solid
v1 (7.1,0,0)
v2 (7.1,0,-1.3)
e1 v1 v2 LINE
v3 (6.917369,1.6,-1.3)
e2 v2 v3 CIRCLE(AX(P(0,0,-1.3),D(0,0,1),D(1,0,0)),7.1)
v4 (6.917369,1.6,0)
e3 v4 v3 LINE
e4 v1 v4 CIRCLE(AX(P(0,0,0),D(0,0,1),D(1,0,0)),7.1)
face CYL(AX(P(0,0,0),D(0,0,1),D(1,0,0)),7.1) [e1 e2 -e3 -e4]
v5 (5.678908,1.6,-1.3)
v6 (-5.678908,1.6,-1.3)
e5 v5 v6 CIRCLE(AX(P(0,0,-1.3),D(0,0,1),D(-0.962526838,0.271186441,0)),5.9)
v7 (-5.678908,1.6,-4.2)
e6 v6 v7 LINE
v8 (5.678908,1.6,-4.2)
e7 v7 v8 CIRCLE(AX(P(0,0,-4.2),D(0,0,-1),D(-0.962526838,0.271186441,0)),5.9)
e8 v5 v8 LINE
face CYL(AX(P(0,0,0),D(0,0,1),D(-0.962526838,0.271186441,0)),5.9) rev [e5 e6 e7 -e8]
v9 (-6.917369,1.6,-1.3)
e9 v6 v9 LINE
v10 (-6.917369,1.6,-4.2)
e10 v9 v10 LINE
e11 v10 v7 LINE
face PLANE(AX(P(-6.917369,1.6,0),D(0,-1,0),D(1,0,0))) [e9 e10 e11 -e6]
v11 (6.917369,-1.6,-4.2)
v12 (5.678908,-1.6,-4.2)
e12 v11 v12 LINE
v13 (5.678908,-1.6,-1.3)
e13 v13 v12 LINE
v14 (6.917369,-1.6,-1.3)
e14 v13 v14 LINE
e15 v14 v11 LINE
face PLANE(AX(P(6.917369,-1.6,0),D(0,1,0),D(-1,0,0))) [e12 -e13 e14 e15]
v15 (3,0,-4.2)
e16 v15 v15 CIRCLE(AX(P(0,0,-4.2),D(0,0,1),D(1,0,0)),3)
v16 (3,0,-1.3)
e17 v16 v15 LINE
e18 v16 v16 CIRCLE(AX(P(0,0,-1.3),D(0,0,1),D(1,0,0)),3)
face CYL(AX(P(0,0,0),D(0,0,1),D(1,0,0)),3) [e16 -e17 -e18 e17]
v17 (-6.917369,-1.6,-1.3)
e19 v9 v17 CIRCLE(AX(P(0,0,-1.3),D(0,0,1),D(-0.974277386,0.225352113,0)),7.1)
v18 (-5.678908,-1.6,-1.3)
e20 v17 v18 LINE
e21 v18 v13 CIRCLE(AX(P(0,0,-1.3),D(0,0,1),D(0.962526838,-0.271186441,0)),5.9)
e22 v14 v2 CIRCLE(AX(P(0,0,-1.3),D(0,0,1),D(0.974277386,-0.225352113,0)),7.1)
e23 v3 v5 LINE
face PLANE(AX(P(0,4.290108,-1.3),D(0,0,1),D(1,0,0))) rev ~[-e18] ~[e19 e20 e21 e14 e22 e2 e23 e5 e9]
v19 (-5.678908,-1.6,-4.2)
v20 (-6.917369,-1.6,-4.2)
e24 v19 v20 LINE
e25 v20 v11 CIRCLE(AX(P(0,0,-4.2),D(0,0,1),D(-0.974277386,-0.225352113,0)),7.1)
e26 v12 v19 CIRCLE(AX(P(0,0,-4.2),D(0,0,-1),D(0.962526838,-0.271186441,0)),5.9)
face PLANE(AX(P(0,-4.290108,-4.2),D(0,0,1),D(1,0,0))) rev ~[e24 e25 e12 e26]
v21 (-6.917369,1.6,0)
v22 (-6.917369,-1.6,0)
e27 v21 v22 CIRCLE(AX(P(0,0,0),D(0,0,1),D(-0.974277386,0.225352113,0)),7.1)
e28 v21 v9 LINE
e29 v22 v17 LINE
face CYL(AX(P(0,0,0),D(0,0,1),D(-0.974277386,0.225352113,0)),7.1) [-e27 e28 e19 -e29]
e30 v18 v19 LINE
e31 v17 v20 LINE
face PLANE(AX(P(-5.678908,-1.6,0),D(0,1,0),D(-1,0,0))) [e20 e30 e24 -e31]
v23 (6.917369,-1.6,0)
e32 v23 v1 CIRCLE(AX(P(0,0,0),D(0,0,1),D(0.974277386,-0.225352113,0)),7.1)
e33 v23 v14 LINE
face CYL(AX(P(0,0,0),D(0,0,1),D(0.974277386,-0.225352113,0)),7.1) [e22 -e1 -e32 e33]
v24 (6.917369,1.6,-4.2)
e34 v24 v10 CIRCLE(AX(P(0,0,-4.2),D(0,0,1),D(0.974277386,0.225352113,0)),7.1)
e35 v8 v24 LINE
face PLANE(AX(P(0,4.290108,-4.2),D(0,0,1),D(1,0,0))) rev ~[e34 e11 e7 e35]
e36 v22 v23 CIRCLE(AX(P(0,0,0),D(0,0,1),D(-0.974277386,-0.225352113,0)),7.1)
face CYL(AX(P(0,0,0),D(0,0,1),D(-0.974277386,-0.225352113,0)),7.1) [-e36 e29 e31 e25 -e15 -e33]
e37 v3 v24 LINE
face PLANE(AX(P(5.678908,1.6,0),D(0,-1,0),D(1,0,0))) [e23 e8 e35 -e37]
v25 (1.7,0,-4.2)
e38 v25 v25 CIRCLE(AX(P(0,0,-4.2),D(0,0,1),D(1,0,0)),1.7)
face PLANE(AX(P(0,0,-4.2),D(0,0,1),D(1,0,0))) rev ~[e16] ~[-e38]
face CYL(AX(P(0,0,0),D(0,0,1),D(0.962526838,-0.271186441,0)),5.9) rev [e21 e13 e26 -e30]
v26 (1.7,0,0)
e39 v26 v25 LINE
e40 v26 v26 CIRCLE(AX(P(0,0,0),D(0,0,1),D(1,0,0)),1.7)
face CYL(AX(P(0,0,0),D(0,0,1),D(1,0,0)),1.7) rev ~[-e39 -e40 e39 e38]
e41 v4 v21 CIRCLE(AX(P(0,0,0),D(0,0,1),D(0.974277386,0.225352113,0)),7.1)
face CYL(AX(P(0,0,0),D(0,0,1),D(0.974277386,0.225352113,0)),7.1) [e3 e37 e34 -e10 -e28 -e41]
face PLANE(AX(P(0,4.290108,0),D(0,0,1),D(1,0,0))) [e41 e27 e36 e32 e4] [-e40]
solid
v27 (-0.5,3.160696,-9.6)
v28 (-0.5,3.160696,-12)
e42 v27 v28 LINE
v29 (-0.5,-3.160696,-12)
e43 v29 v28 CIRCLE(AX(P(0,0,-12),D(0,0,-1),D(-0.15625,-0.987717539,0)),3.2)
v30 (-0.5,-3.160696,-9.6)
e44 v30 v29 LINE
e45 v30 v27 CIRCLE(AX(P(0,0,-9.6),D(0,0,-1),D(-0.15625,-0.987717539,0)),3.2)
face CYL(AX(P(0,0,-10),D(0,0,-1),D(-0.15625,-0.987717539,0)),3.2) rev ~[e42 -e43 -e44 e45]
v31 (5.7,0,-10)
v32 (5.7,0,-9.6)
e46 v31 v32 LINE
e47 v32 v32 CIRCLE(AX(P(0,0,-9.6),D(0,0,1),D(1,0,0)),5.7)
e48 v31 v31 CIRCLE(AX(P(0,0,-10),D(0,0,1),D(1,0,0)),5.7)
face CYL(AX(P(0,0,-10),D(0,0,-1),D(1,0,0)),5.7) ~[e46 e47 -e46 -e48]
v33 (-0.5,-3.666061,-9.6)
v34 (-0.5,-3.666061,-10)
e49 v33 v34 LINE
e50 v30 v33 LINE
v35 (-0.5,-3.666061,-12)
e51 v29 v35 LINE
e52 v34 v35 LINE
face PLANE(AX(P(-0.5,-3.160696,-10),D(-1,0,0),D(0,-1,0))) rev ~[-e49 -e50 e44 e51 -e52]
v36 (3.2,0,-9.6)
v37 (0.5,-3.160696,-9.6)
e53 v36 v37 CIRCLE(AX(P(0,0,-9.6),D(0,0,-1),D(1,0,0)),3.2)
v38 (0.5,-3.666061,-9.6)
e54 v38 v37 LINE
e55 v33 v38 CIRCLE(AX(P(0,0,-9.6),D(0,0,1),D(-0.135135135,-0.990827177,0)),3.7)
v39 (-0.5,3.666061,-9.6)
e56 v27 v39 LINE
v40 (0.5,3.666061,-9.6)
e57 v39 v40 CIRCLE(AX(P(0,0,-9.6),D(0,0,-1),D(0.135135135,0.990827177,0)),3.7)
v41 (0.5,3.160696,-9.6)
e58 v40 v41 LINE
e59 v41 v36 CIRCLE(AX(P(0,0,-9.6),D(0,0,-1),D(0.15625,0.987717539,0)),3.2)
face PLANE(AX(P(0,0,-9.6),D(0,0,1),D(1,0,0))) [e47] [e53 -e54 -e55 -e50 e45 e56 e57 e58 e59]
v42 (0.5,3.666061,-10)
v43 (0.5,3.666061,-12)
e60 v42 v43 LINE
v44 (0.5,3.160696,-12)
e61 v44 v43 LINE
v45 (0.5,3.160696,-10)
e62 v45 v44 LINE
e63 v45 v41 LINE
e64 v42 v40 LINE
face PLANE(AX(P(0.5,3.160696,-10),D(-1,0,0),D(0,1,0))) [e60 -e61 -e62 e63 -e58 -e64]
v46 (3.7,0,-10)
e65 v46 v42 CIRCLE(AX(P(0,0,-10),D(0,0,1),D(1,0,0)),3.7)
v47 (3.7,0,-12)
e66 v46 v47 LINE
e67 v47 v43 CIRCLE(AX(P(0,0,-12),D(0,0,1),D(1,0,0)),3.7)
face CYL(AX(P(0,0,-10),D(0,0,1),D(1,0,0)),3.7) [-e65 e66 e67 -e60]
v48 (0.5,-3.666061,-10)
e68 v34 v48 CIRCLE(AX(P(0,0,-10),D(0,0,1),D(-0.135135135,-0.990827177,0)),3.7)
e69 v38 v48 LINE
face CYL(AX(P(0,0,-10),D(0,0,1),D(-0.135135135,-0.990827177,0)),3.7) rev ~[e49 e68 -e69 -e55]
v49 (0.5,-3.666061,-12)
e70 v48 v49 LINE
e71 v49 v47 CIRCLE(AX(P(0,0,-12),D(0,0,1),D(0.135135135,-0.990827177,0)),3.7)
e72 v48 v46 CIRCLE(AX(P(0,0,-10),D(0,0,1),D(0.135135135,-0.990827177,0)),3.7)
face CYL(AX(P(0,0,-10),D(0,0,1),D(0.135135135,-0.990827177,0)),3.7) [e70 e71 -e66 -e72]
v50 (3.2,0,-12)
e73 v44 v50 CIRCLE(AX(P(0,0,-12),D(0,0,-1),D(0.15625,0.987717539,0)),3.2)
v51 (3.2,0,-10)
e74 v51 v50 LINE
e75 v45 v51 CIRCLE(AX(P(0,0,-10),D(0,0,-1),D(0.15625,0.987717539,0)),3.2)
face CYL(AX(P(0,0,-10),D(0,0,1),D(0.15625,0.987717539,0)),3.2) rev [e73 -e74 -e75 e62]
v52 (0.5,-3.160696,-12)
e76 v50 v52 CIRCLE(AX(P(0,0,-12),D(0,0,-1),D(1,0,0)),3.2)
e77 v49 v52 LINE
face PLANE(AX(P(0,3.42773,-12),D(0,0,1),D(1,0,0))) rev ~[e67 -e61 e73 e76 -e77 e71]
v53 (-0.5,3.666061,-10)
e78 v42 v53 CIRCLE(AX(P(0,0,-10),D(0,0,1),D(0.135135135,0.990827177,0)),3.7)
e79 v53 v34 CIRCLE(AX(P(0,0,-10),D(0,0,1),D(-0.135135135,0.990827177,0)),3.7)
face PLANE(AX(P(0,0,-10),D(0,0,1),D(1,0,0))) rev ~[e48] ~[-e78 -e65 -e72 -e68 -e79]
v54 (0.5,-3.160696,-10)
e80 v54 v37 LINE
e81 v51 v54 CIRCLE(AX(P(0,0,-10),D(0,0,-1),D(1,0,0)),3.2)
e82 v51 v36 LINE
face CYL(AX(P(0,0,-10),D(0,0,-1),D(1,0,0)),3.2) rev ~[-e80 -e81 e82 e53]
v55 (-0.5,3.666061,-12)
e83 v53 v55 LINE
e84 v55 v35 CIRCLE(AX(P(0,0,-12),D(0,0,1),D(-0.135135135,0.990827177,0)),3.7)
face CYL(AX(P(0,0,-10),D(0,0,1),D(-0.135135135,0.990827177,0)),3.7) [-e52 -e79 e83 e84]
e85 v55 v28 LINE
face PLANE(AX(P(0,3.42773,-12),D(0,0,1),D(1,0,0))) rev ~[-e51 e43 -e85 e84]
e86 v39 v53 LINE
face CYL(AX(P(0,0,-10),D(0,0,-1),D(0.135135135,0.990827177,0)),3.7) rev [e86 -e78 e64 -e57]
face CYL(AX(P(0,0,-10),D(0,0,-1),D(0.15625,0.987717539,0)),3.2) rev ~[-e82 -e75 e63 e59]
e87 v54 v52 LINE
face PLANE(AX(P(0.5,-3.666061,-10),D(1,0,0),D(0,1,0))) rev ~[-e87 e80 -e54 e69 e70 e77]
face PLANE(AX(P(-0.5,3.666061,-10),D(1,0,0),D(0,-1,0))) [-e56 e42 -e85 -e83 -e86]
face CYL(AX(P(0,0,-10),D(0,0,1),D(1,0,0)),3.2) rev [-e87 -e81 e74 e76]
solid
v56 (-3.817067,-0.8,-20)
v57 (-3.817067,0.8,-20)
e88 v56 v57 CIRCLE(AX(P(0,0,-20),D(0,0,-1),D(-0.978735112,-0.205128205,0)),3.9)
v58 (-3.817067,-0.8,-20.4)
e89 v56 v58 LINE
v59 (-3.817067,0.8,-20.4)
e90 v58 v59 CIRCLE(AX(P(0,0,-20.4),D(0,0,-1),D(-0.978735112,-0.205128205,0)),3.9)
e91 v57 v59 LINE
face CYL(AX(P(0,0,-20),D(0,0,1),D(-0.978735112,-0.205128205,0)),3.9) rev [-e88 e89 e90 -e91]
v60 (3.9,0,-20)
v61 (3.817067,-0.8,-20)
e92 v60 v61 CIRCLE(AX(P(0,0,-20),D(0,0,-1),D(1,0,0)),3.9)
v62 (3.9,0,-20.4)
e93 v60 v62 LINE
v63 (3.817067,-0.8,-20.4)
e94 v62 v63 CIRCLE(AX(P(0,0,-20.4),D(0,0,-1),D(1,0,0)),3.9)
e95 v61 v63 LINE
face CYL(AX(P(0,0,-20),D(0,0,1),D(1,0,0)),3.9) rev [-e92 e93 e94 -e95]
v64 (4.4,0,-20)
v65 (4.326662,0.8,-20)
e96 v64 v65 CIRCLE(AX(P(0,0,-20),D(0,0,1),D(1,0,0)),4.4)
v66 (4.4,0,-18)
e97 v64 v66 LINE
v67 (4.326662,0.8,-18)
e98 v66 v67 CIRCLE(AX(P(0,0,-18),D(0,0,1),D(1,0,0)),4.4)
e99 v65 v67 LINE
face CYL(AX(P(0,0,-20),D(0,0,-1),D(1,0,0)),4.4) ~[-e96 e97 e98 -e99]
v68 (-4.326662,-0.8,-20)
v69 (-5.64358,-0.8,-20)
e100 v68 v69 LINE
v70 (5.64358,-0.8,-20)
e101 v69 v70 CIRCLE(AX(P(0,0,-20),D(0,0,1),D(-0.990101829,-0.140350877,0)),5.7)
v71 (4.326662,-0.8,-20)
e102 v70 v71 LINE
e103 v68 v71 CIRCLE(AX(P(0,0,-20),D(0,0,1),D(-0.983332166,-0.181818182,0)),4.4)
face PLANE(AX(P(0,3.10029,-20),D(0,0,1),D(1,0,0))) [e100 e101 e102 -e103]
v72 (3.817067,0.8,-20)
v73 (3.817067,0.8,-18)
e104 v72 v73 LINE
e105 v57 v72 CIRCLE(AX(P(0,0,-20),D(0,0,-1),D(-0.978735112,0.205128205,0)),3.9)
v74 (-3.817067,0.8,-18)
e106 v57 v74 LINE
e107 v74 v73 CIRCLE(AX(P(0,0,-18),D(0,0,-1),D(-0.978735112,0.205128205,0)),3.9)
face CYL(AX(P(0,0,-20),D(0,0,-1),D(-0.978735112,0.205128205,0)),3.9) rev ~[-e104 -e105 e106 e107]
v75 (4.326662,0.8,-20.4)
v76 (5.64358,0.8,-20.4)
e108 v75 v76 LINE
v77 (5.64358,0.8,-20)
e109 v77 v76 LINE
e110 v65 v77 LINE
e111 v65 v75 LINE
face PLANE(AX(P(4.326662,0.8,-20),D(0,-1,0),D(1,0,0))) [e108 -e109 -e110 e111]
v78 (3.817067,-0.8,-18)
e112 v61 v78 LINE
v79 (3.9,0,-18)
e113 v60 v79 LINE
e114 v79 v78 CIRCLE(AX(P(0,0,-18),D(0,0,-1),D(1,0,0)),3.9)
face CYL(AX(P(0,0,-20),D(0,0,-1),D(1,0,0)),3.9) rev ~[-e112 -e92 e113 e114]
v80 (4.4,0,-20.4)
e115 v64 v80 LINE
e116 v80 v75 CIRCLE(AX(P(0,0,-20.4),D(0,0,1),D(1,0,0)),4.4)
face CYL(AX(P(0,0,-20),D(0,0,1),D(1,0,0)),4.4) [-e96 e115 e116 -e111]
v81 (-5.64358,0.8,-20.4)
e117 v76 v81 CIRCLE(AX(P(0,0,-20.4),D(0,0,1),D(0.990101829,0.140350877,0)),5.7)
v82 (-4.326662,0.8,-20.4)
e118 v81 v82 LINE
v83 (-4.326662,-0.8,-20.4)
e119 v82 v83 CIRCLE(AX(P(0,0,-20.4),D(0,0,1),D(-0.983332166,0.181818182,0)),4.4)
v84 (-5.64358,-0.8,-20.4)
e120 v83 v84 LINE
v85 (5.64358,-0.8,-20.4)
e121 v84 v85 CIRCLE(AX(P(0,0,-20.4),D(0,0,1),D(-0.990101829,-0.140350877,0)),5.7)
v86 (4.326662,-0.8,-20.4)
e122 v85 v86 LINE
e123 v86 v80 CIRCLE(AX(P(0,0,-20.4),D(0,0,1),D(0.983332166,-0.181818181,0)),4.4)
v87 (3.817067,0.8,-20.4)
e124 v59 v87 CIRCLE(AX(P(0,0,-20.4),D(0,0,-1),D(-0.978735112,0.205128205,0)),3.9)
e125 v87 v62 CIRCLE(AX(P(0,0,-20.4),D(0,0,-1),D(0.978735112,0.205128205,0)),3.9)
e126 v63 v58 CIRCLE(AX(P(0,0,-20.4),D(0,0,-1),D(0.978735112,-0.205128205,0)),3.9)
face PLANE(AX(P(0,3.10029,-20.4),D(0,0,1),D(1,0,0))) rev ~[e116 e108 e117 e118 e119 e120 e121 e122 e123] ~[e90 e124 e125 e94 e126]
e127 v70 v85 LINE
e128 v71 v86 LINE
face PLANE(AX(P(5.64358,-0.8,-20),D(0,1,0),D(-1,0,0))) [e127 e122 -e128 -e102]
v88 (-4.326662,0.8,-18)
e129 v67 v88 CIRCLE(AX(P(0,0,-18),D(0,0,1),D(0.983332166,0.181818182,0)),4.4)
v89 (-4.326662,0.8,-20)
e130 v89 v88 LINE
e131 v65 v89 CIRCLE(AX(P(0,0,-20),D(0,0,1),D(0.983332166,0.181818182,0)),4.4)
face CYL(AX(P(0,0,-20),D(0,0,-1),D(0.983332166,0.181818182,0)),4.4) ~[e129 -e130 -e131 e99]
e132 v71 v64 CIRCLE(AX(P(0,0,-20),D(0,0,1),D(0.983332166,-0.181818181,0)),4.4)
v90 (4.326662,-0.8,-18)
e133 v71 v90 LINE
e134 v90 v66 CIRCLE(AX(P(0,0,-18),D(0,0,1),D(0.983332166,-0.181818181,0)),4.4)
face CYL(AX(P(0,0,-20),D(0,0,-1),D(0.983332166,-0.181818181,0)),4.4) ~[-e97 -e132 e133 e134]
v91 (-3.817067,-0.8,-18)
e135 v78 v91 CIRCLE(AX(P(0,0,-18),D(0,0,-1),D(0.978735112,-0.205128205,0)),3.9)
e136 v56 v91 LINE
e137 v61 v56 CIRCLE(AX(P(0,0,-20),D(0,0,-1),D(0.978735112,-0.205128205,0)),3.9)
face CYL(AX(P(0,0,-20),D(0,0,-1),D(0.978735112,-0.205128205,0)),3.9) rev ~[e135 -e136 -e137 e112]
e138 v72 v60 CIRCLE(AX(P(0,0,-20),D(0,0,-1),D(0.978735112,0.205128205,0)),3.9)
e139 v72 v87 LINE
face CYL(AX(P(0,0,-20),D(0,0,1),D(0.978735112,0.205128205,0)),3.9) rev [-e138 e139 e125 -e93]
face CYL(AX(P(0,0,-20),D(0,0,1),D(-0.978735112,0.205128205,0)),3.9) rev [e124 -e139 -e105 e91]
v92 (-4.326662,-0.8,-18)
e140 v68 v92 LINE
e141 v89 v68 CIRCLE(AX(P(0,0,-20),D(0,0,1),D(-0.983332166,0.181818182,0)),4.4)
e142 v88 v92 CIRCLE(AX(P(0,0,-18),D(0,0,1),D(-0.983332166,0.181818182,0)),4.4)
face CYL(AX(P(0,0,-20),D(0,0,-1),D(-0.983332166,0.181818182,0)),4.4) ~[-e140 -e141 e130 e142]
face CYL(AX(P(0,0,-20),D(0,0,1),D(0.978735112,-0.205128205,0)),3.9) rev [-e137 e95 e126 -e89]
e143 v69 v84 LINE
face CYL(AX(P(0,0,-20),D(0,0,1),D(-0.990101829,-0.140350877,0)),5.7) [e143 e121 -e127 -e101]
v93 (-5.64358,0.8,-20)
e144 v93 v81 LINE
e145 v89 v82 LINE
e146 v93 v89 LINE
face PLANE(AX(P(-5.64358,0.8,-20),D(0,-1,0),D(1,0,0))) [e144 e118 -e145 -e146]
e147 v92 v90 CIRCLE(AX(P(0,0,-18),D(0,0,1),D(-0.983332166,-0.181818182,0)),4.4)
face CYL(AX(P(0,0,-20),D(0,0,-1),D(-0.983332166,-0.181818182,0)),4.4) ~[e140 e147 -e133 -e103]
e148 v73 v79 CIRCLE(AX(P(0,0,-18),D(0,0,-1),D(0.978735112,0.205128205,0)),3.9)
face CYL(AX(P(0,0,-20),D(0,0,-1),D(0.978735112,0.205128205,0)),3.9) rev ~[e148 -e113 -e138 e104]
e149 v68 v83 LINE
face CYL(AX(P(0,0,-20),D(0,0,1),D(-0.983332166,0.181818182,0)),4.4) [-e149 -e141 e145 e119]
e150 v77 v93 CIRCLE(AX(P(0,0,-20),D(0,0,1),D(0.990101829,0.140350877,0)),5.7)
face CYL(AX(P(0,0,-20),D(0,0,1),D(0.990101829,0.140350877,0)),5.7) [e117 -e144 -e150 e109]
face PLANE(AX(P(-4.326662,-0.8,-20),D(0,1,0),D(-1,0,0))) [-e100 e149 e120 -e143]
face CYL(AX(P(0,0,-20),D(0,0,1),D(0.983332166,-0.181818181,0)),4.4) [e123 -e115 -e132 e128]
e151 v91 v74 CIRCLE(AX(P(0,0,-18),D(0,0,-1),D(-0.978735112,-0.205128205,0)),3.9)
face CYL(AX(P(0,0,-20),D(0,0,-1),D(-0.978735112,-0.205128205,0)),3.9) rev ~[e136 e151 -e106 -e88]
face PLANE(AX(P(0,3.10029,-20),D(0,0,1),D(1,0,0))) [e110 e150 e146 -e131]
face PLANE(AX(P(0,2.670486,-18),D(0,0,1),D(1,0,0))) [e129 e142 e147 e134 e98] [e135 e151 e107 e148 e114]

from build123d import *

# Parameters (mm, degrees)
F1_DEPTH  = 4.2
F0_R      = 3
F0_R_2    = 1.7
F2_DEPTH  = 1.3
F5_DEPTH  = 2
F4_R      = 5.7
F6_DEPTH  = 0.4
F7_DEPTH  = 2
F10_DEPTH = 2
F11_DEPTH = 0.4


with BuildPart() as f1:
    # F0 (on Top) → F1 (new body)
    with BuildSketch(Plane.XY):
        with BuildLine():
            Line((5.6789083458, 1.6), (6.9173694422, 1.6))
            ThreePointArc((6.9173694422, 1.6), (0, 7.1), (-6.9173694422, 1.6))
            Line((-6.9173694422, 1.6), (-5.6789083458, 1.6))
            ThreePointArc((-5.6789083458, 1.6), (0, 5.9), (5.6789083458, 1.6))
        make_face()
    extrude(amount=-F1_DEPTH)



with BuildPart() as f1b:
    # F0 (on Top) → F1, piece 2 (new body)
    with BuildSketch(Plane.XY):
        with BuildLine():
            ThreePointArc((-6.9173694422, -1.6), (0, -7.1), (6.9173694422, -1.6))
            Line((6.9173694422, -1.6), (5.6789083458, -1.6))
            ThreePointArc((5.6789083458, -1.6), (0, -5.9), (-5.6789083458, -1.6))
            Line((-5.6789083458, -1.6), (-6.9173694422, -1.6))
        make_face()
    extrude(amount=-F1_DEPTH)


with BuildPart() as f1c:
    # F0 (on Top) → F1, piece 3 (new body)
    with BuildSketch(Plane.XY):
        Circle(F0_R)
        Circle(F0_R_2, mode=Mode.SUBTRACT)
    extrude(amount=-F1_DEPTH)


with BuildPart() as f1_1:
    add(f1.part)

    add(f1b.part)  # F2 merges F1b

    add(f1c.part)  # F2 merges F1c
    # F0 (on Top) → F2 (join)
    with BuildSketch(Plane.XY):
        with BuildLine():
            Line((5.6789083458, 1.6), (6.9173694422, 1.6))
            ThreePointArc((6.9173694422, 1.6), (0, 7.1), (-6.9173694422, 1.6))
            Line((-6.9173694422, 1.6), (-5.6789083458, 1.6))
            ThreePointArc((-5.6789083458, 1.6), (0, 5.9), (5.6789083458, 1.6))
        make_face()
        with BuildLine():
            Line((-5.6789083458, 1.6), (-6.9173694422, 1.6))
            ThreePointArc((-6.9173694422, 1.6), (-7.1, 0), (-6.9173694422, -1.6))
            Line((-6.9173694422, -1.6), (-5.6789083458, -1.6))
            ThreePointArc((-5.6789083458, -1.6), (-5.9, 0), (-5.6789083458, 1.6))
        make_face()
        with BuildLine():
            ThreePointArc((-6.9173694422, -1.6), (0, -7.1), (6.9173694422, -1.6))
            Line((6.9173694422, -1.6), (5.6789083458, -1.6))
            ThreePointArc((5.6789083458, -1.6), (0, -5.9), (-5.6789083458, -1.6))
            Line((-5.6789083458, -1.6), (-6.9173694422, -1.6))
        make_face()
        with BuildLine():
            ThreePointArc((6.9173694422, -1.6), (7.0541946046, -0.8051946846), (7.1, 0))
            ThreePointArc((7.1, 0), (7.0541946046, 0.8051946846), (6.9173694422, 1.6))
            Line((6.9173694422, 1.6), (5.6789083458, 1.6))
            ThreePointArc((5.6789083458, 1.6), (5.8444657258, 0.807601622), (5.9, 0))
            ThreePointArc((5.9, 0), (5.8444657258, -0.807601622), (5.6789083458, -1.6))
            Line((5.6789083458, -1.6), (6.9173694422, -1.6))
        make_face()
        with BuildLine():
            Line((5.6789083458, -1.6), (5.6789083458, 1.6))
            ThreePointArc((5.6789083458, 1.6), (0, 5.9), (-5.6789083458, 1.6))
            Line((-5.6789083458, 1.6), (-5.6789083458, -1.6))
            ThreePointArc((-5.6789083458, -1.6), (0, -5.9), (5.6789083458, -1.6))
        make_face()
        Circle(F0_R, mode=Mode.SUBTRACT)
        with BuildLine():
            Line((-5.6789083458, -1.6), (-5.6789083458, 1.6))
            ThreePointArc((-5.6789083458, 1.6), (-5.9, 0), (-5.6789083458, -1.6))
        make_face()
        with BuildLine():
            ThreePointArc((5.9, 0), (5.8444657258, 0.807601622), (5.6789083458, 1.6))
            Line((5.6789083458, 1.6), (5.6789083458, -1.6))
            ThreePointArc((5.6789083458, -1.6), (5.8444657258, -0.807601622), (5.9, 0))
        make_face()
    extrude(amount=-F2_DEPTH)


with BuildPart() as f5:
    # F4 (on offset) → F5 (new body)
    with BuildSketch(Plane.XY.offset(-10)):
        with BuildLine():
            ThreePointArc((-0.5, 3.1606961259), (0, 3.2), (0.5, 3.1606961259))
            Line((0.5, 3.1606961259), (0.5, 3.666060556))
            ThreePointArc((0.5, 3.666060556), (0, 3.7), (-0.5, 3.666060556))
            Line((-0.5, 3.666060556), (-0.5, 3.1606961259))
        make_face()
        with BuildLine():
            ThreePointArc((-0.5, -3.1606961259), (-3.2, 0), (-0.5, 3.1606961259))
            Line((-0.5, 3.1606961259), (-0.5, 3.666060556))
            ThreePointArc((-0.5, 3.666060556), (-3.7, 0), (-0.5, -3.666060556))
            Line((-0.5, -3.666060556), (-0.5, -3.1606961259))
        make_face()
        with BuildLine():
            Line((0.5, -3.666060556), (0.5, -3.1606961259))
            ThreePointArc((0.5, -3.1606961259), (0, -3.2), (-0.5, -3.1606961259))
            Line((-0.5, -3.1606961259), (-0.5, -3.666060556))
            ThreePointArc((-0.5, -3.666060556), (0, -3.7), (0.5, -3.666060556))
        make_face()
        with BuildLine():
            ThreePointArc((0.5, 3.1606961259), (2.4331050121, 2.0784609691), (3.2, 0))
            ThreePointArc((3.2, 0), (2.4331050121, -2.0784609691), (0.5, -3.1606961259))
            Line((0.5, -3.1606961259), (0.5, -3.666060556))
            ThreePointArc((0.5, -3.666060556), (2.787471973, -2.4331050121), (3.7, 0))
            ThreePointArc((3.7, 0), (2.787471973, 2.4331050121), (0.5, 3.666060556))
            Line((0.5, 3.666060556), (0.5, 3.1606961259))
        make_face()
    extrude(amount=-F5_DEPTH)

    # F4 (on offset) → F6 (join)
    with BuildSketch(Plane.XY.offset(-10)):
        Circle(F4_R)
        with BuildLine():
            Line((0.5, 4.331942182), (0.5, 3.666060556))
            ThreePointArc((0.5, 3.666060556), (2.787471973, 2.4331050121), (3.7, 0))
            ThreePointArc((3.7, 0), (2.787471973, -2.4331050121), (0.5, -3.666060556))
            Line((0.5, -3.666060556), (0.5, -4.331942182))
            Line((0.5, -4.331942182), (-0.5, -4.331942182))
            Line((-0.5, -4.331942182), (-0.5, -3.666060556))
            ThreePointArc((-0.5, -3.666060556), (-3.7, 0), (-0.5, 3.666060556))
            Line((-0.5, 3.666060556), (-0.5, 4.331942182))
            Line((-0.5, 4.331942182), (0.5, 4.331942182))
        make_face(mode=Mode.SUBTRACT)
        with BuildLine():
            ThreePointArc((-0.5, -3.1606961259), (-3.2, 0), (-0.5, 3.1606961259))
            Line((-0.5, 3.1606961259), (-0.5, 3.666060556))
            ThreePointArc((-0.5, 3.666060556), (-3.7, 0), (-0.5, -3.666060556))
            Line((-0.5, -3.666060556), (-0.5, -3.1606961259))
        make_face()
        with BuildLine():
            ThreePointArc((0.5, 3.1606961259), (2.4331050121, 2.0784609691), (3.2, 0))
            ThreePointArc((3.2, 0), (2.4331050121, -2.0784609691), (0.5, -3.1606961259))
            Line((0.5, -3.1606961259), (0.5, -3.666060556))
            ThreePointArc((0.5, -3.666060556), (2.787471973, -2.4331050121), (3.7, 0))
            ThreePointArc((3.7, 0), (2.787471973, 2.4331050121), (0.5, 3.666060556))
            Line((0.5, 3.666060556), (0.5, 3.1606961259))
        make_face()
        with BuildLine():
            ThreePointArc((-0.5, 3.666060556), (0, 3.7), (0.5, 3.666060556))
            Line((0.5, 3.666060556), (0.5, 4.331942182))
            Line((0.5, 4.331942182), (-0.5, 4.331942182))
            Line((-0.5, 4.331942182), (-0.5, 3.666060556))
        make_face()
        with BuildLine():
            Line((0.5, -4.331942182), (0.5, -3.666060556))
            ThreePointArc((0.5, -3.666060556), (0, -3.7), (-0.5, -3.666060556))
            Line((-0.5, -3.666060556), (-0.5, -4.331942182))
            Line((-0.5, -4.331942182), (0.5, -4.331942182))
        make_face()
        with BuildLine():
            ThreePointArc((-0.5, 3.1606961259), (0, 3.2), (0.5, 3.1606961259))
            Line((0.5, 3.1606961259), (0.5, 3.666060556))
            ThreePointArc((0.5, 3.666060556), (0, 3.7), (-0.5, 3.666060556))
            Line((-0.5, 3.666060556), (-0.5, 3.1606961259))
        make_face()
        with BuildLine():
            Line((0.5, -3.666060556), (0.5, -3.1606961259))
            ThreePointArc((0.5, -3.1606961259), (0, -3.2), (-0.5, -3.1606961259))
            Line((-0.5, -3.1606961259), (-0.5, -3.666060556))
            ThreePointArc((-0.5, -3.666060556), (0, -3.7), (0.5, -3.666060556))
        make_face()
    extrude(amount=F6_DEPTH)

    # F4 (on offset) → F7 (cut, symmetric)
    with BuildSketch(Plane.XY.offset(-10)):
        with BuildLine():
            ThreePointArc((-0.5, 3.1606961259), (0, 3.2), (0.5, 3.1606961259))
            Line((0.5, 3.1606961259), (0.5, 3.666060556))
            ThreePointArc((0.5, 3.666060556), (0, 3.7), (-0.5, 3.666060556))
            Line((-0.5, 3.666060556), (-0.5, 3.1606961259))
        make_face()
        with BuildLine():
            Line((0.5, -3.666060556), (0.5, -3.1606961259))
            ThreePointArc((0.5, -3.1606961259), (0, -3.2), (-0.5, -3.1606961259))
            Line((-0.5, -3.1606961259), (-0.5, -3.666060556))
            ThreePointArc((-0.5, -3.666060556), (0, -3.7), (0.5, -3.666060556))
        make_face()
    extrude(amount=F7_DEPTH, both=True, mode=Mode.SUBTRACT)


with BuildPart() as f10:
    # F9 (on offset) → F10 (new body)
    with BuildSketch(Plane.XY.offset(-20)):
        with BuildLine():
            Line((3.8170669368, 0.8), (4.3266615306, 0.8))
            ThreePointArc((4.3266615306, 0.8), (0, 4.4), (-4.3266615306, 0.8))
            Line((-4.3266615306, 0.8), (-3.8170669368, 0.8))
            ThreePointArc((-3.8170669368, 0.8), (0, 3.9), (3.8170669368, 0.8))
        make_face()
        with BuildLine():
            Line((-3.8170669368, 0.8), (-4.3266615306, 0.8))
            ThreePointArc((-4.3266615306, 0.8), (-4.4, 0), (-4.3266615306, -0.8))
            Line((-4.3266615306, -0.8), (-3.8170669368, -0.8))
            ThreePointArc((-3.8170669368, -0.8), (-3.9, 0), (-3.8170669368, 0.8))
        make_face()
        with BuildLine():
            ThreePointArc((-4.3266615306, -0.8), (0, -4.4), (4.3266615306, -0.8))
            Line((4.3266615306, -0.8), (3.8170669368, -0.8))
            ThreePointArc((3.8170669368, -0.8), (0, -3.9), (-3.8170669368, -0.8))
            Line((-3.8170669368, -0.8), (-4.3266615306, -0.8))
        make_face()
        with BuildLine():
            ThreePointArc((4.4, 0), (4.3816270228, 0.4016772744), (4.3266615306, 0.8))
            Line((4.3266615306, 0.8), (3.8170669368, 0.8))
            ThreePointArc((3.8170669368, 0.8), (3.8792113279, 0.4021435978), (3.9, 0))
            ThreePointArc((3.9, 0), (3.8792113279, -0.4021435978), (3.8170669368, -0.8))
            Line((3.8170669368, -0.8), (4.3266615306, -0.8))
            ThreePointArc((4.3266615306, -0.8), (4.3816270228, -0.4016772744), (4.4, 0))
        make_face()
    extrude(amount=F10_DEPTH)

    # F9 (on offset) → F11 (join)
    with BuildSketch(Plane.XY.offset(-20)):
        with BuildLine():
            Line((4.3266615306, 0.8), (5.6435804238, 0.8))
            ThreePointArc((5.6435804238, 0.8), (0, 5.7), (-5.6435804238, 0.8))
            Line((-5.6435804238, 0.8), (-4.3266615306, 0.8))
            ThreePointArc((-4.3266615306, 0.8), (0, 4.4), (4.3266615306, 0.8))
        make_face()
        with BuildLine():
            ThreePointArc((-5.6435804238, -0.8), (0, -5.7), (5.6435804238, -0.8))
            Line((5.6435804238, -0.8), (4.3266615306, -0.8))
            ThreePointArc((4.3266615306, -0.8), (0, -4.4), (-4.3266615306, -0.8))
            Line((-4.3266615306, -0.8), (-5.6435804238, -0.8))
        make_face()
        with BuildLine():
            Line((3.8170669368, 0.8), (4.3266615306, 0.8))
            ThreePointArc((4.3266615306, 0.8), (0, 4.4), (-4.3266615306, 0.8))
            Line((-4.3266615306, 0.8), (-3.8170669368, 0.8))
            ThreePointArc((-3.8170669368, 0.8), (0, 3.9), (3.8170669368, 0.8))
        make_face()
        with BuildLine():
            ThreePointArc((4.4, 0), (4.3816270228, 0.4016772744), (4.3266615306, 0.8))
            Line((4.3266615306, 0.8), (3.8170669368, 0.8))
            ThreePointArc((3.8170669368, 0.8), (3.8792113279, 0.4021435978), (3.9, 0))
            ThreePointArc((3.9, 0), (3.8792113279, -0.4021435978), (3.8170669368, -0.8))
            Line((3.8170669368, -0.8), (4.3266615306, -0.8))
            ThreePointArc((4.3266615306, -0.8), (4.3816270228, -0.4016772744), (4.4, 0))
        make_face()
        with BuildLine():
            ThreePointArc((-4.3266615306, -0.8), (0, -4.4), (4.3266615306, -0.8))
            Line((4.3266615306, -0.8), (3.8170669368, -0.8))
            ThreePointArc((3.8170669368, -0.8), (0, -3.9), (-3.8170669368, -0.8))
            Line((-3.8170669368, -0.8), (-4.3266615306, -0.8))
        make_face()
        with BuildLine():
            Line((-3.8170669368, 0.8), (-4.3266615306, 0.8))
            ThreePointArc((-4.3266615306, 0.8), (-4.4, 0), (-4.3266615306, -0.8))
            Line((-4.3266615306, -0.8), (-3.8170669368, -0.8))
            ThreePointArc((-3.8170669368, -0.8), (-3.9, 0), (-3.8170669368, 0.8))
        make_face()
    extrude(amount=-F11_DEPTH)


solid = Compound([f1_1.part, f5.part, f10.part])
